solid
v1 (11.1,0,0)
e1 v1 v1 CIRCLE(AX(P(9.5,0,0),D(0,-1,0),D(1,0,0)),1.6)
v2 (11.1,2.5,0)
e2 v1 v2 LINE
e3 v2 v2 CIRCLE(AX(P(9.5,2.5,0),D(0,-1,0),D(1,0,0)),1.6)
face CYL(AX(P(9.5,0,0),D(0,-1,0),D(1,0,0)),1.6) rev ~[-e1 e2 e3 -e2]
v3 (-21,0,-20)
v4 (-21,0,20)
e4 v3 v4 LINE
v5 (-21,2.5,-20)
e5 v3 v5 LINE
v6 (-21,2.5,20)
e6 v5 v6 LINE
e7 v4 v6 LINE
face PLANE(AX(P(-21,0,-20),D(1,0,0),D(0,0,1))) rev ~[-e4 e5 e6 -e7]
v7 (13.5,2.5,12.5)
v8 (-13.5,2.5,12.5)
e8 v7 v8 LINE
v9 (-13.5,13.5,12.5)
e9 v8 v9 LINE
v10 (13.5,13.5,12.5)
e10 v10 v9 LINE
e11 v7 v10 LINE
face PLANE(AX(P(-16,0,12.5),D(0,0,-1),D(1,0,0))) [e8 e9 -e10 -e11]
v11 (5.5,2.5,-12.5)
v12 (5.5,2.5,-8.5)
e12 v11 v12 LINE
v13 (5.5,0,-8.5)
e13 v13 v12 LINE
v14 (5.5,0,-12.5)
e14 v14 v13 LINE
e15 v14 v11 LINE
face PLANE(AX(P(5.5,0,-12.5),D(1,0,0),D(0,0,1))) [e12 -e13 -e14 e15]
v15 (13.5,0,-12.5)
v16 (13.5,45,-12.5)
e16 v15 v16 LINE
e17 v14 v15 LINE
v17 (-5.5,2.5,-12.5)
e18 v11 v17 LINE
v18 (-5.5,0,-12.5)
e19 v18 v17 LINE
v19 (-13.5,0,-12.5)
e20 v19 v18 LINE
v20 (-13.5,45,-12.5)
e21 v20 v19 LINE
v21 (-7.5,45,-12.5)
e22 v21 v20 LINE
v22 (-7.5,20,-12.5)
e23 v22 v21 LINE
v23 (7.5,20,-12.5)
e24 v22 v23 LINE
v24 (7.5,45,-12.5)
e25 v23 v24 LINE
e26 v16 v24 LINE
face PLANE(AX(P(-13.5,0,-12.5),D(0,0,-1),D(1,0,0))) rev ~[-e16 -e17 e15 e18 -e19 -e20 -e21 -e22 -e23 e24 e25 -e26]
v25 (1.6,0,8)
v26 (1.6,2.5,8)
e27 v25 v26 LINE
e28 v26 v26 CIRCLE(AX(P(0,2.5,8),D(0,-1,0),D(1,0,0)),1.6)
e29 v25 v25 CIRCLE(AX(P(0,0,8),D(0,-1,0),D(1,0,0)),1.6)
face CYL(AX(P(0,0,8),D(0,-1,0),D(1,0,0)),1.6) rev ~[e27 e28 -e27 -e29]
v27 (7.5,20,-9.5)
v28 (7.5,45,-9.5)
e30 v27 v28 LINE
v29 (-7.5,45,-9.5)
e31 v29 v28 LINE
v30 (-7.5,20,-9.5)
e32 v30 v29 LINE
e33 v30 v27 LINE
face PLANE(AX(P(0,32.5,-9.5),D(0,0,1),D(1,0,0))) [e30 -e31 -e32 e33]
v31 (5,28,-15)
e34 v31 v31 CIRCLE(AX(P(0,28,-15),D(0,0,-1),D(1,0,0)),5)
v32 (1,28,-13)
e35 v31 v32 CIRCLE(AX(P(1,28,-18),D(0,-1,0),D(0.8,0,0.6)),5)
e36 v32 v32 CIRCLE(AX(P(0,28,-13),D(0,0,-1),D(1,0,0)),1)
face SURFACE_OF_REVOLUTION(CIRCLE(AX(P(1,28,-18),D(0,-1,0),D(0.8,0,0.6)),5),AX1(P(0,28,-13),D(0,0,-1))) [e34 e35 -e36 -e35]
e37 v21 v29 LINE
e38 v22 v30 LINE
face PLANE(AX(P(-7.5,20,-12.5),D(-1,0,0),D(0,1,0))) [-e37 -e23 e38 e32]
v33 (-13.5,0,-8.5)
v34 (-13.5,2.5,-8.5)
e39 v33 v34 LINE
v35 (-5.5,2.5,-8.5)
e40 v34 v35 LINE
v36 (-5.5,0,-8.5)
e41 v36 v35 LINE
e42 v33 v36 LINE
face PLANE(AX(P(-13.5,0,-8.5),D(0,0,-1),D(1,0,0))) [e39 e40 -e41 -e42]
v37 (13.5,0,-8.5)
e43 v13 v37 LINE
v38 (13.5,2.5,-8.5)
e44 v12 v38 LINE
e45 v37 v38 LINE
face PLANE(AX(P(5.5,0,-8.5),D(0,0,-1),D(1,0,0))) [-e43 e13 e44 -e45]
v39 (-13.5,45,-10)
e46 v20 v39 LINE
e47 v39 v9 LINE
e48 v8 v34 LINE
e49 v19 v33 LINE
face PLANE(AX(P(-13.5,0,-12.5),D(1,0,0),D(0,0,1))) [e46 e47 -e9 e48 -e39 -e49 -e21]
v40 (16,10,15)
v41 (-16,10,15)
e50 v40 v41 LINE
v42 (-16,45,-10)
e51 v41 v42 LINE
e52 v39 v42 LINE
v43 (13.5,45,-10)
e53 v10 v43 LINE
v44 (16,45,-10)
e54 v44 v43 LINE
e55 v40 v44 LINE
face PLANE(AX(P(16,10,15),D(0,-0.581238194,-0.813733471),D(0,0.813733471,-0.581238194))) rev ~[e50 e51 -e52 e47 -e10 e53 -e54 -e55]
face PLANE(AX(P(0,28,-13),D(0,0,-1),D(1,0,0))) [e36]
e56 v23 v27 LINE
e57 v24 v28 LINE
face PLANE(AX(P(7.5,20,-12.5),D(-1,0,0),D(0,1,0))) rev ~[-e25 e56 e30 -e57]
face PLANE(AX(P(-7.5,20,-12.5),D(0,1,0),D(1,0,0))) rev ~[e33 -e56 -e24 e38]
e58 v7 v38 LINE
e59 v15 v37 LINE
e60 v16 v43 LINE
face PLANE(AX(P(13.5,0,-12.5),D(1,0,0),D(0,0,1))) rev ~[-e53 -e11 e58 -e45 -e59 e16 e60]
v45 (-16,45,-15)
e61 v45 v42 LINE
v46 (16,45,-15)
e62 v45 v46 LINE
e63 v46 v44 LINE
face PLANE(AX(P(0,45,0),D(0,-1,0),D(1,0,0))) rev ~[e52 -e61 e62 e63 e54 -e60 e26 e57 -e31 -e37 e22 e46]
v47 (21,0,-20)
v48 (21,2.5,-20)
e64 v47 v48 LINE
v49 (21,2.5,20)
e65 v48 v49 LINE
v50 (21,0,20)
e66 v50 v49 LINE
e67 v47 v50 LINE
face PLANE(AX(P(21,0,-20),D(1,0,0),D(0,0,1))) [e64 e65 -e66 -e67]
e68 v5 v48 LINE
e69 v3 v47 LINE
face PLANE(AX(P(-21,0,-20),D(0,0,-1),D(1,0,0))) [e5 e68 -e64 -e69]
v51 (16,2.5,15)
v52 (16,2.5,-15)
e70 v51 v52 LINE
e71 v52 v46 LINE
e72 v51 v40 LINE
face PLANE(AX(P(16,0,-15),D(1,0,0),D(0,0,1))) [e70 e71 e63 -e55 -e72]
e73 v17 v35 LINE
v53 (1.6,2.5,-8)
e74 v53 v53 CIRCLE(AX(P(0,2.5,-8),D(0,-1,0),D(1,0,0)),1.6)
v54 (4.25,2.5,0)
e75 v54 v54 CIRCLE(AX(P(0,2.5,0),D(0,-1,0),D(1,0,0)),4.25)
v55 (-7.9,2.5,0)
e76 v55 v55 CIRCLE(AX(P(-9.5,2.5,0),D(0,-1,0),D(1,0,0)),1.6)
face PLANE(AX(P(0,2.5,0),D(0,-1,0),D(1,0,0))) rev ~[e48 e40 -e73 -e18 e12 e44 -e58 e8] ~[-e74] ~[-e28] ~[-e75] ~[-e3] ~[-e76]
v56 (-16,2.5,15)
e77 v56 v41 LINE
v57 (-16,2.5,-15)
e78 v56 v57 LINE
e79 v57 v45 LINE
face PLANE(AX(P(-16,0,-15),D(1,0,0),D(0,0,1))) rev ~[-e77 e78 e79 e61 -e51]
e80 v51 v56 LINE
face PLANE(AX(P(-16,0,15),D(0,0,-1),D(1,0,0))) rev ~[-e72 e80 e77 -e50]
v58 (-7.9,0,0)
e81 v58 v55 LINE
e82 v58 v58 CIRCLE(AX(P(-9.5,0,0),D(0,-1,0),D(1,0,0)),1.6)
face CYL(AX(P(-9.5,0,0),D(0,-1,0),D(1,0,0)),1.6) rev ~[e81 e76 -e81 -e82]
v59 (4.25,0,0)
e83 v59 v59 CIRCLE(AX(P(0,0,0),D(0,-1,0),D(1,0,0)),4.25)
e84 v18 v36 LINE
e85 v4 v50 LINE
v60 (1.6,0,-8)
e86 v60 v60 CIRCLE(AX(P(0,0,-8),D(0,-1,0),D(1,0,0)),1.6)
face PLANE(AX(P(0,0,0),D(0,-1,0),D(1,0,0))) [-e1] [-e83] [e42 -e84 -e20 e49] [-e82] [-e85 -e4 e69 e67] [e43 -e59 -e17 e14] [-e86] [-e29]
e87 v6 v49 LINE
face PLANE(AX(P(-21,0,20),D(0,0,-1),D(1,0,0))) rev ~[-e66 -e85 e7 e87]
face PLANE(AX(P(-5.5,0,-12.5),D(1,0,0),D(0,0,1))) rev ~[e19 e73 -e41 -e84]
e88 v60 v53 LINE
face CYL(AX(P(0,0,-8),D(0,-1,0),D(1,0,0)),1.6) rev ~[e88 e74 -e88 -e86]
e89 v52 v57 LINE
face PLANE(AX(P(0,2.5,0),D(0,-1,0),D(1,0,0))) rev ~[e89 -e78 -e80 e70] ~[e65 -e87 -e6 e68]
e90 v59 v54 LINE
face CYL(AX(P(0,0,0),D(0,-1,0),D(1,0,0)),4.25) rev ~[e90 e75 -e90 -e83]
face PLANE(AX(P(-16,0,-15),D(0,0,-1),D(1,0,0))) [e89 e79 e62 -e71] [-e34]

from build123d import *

# Parameters (mm, degrees)
F0_W      = 32
F0_H      = 30
F1_DEPTH  = 45
F2_T      = -2.5
F4_DEPTH  = 32.001
F5_W      = 42
F5_H      = 40
F6_DEPTH  = 2.5
F7_R      = 1.6
F7_R_2    = 4.25
F7_W      = 8
F7_H      = 4
F8_DEPTH  = 45.001
F9_W      = 15
F9_H      = 25
F10_DEPTH = 3
F11_R     = 5
F12_DEPTH = 2


# Not quite as in the source:
# - a fillet or chamfer that OpenCascade refuses, or shapes differently, is made with other operations: its cross-section is extruded or revolved along the edge and cut away or added


with BuildPart() as f1:
    # F0 (on Front) → F1 (new body)
    with BuildSketch(Plane.XZ):
        Rectangle(F0_W, F0_H)
    extrude(amount=-F1_DEPTH)

    # F2
    f2_openings = [f1.faces().sort_by_distance(p)[0] for p in [
        (0, 45, 0),
    ]]
    offset(amount=F2_T, openings=f2_openings)

    # F3 (on face) → F4 (cut, through all)
    with BuildSketch(Plane.YZ.offset(16)):
        Polygon((45, 15), (10, 15), (45, -10), align=None)
    extrude(amount=-F4_DEPTH, mode=Mode.SUBTRACT)

    # F5 (on face) → F6 (join)
    with BuildSketch(Plane.XZ):
        Rectangle(F5_W, F5_H)
    extrude(amount=-F6_DEPTH)

    # F7 (on face) → F8 (cut, through all)
    with BuildSketch(Plane.XZ):
        with Locations((9.5, 0)):
            Circle(F7_R)
        with Locations((-9.5, 0)):
            Circle(F7_R)
        with Locations((0, -8)):
            Circle(F7_R)
        with Locations((0, 8)):
            Circle(F7_R)
        Circle(F7_R_2)
        with Locations((9.5, -10.5)):
            Rectangle(F7_W, F7_H)
        with Locations((-9.5, -10.5)):
            Rectangle(F7_W, F7_H)
    extrude(amount=-F8_DEPTH, mode=Mode.SUBTRACT)

    # F9 (on face) → F10 (join)
    with BuildSketch(Plane.XY.offset(-12.5)):
        with Locations((0, 32.5)):
            Rectangle(F9_W, F9_H)
    extrude(amount=F10_DEPTH)

    # F11 (on face) → F12 (cut)
    with BuildSketch(Plane(origin=(0, 0, -15), x_dir=(1, 0, 0), z_dir=(0, 0, -1))):
        with Locations((0, -28)):
            Circle(F11_R)
    extrude(amount=-F12_DEPTH, mode=Mode.SUBTRACT)

    # F13: fillet of radius 5 on 1 edges, made by hand

    # F13_s1 → F13_t2 (revolve)
    with BuildSketch(Plane.XZ.offset(-28)):
        with BuildLine():
            ThreePointArc((5, -15), (3.2360679775, -13.527864045), (1, -13))
            Line((1, -13), (5, -13))
            Line((5, -13), (5, -15))
        make_face()
    revolve(axis=Axis((0, 28, -13), (0, 0, -1)))


solid = f1.part
